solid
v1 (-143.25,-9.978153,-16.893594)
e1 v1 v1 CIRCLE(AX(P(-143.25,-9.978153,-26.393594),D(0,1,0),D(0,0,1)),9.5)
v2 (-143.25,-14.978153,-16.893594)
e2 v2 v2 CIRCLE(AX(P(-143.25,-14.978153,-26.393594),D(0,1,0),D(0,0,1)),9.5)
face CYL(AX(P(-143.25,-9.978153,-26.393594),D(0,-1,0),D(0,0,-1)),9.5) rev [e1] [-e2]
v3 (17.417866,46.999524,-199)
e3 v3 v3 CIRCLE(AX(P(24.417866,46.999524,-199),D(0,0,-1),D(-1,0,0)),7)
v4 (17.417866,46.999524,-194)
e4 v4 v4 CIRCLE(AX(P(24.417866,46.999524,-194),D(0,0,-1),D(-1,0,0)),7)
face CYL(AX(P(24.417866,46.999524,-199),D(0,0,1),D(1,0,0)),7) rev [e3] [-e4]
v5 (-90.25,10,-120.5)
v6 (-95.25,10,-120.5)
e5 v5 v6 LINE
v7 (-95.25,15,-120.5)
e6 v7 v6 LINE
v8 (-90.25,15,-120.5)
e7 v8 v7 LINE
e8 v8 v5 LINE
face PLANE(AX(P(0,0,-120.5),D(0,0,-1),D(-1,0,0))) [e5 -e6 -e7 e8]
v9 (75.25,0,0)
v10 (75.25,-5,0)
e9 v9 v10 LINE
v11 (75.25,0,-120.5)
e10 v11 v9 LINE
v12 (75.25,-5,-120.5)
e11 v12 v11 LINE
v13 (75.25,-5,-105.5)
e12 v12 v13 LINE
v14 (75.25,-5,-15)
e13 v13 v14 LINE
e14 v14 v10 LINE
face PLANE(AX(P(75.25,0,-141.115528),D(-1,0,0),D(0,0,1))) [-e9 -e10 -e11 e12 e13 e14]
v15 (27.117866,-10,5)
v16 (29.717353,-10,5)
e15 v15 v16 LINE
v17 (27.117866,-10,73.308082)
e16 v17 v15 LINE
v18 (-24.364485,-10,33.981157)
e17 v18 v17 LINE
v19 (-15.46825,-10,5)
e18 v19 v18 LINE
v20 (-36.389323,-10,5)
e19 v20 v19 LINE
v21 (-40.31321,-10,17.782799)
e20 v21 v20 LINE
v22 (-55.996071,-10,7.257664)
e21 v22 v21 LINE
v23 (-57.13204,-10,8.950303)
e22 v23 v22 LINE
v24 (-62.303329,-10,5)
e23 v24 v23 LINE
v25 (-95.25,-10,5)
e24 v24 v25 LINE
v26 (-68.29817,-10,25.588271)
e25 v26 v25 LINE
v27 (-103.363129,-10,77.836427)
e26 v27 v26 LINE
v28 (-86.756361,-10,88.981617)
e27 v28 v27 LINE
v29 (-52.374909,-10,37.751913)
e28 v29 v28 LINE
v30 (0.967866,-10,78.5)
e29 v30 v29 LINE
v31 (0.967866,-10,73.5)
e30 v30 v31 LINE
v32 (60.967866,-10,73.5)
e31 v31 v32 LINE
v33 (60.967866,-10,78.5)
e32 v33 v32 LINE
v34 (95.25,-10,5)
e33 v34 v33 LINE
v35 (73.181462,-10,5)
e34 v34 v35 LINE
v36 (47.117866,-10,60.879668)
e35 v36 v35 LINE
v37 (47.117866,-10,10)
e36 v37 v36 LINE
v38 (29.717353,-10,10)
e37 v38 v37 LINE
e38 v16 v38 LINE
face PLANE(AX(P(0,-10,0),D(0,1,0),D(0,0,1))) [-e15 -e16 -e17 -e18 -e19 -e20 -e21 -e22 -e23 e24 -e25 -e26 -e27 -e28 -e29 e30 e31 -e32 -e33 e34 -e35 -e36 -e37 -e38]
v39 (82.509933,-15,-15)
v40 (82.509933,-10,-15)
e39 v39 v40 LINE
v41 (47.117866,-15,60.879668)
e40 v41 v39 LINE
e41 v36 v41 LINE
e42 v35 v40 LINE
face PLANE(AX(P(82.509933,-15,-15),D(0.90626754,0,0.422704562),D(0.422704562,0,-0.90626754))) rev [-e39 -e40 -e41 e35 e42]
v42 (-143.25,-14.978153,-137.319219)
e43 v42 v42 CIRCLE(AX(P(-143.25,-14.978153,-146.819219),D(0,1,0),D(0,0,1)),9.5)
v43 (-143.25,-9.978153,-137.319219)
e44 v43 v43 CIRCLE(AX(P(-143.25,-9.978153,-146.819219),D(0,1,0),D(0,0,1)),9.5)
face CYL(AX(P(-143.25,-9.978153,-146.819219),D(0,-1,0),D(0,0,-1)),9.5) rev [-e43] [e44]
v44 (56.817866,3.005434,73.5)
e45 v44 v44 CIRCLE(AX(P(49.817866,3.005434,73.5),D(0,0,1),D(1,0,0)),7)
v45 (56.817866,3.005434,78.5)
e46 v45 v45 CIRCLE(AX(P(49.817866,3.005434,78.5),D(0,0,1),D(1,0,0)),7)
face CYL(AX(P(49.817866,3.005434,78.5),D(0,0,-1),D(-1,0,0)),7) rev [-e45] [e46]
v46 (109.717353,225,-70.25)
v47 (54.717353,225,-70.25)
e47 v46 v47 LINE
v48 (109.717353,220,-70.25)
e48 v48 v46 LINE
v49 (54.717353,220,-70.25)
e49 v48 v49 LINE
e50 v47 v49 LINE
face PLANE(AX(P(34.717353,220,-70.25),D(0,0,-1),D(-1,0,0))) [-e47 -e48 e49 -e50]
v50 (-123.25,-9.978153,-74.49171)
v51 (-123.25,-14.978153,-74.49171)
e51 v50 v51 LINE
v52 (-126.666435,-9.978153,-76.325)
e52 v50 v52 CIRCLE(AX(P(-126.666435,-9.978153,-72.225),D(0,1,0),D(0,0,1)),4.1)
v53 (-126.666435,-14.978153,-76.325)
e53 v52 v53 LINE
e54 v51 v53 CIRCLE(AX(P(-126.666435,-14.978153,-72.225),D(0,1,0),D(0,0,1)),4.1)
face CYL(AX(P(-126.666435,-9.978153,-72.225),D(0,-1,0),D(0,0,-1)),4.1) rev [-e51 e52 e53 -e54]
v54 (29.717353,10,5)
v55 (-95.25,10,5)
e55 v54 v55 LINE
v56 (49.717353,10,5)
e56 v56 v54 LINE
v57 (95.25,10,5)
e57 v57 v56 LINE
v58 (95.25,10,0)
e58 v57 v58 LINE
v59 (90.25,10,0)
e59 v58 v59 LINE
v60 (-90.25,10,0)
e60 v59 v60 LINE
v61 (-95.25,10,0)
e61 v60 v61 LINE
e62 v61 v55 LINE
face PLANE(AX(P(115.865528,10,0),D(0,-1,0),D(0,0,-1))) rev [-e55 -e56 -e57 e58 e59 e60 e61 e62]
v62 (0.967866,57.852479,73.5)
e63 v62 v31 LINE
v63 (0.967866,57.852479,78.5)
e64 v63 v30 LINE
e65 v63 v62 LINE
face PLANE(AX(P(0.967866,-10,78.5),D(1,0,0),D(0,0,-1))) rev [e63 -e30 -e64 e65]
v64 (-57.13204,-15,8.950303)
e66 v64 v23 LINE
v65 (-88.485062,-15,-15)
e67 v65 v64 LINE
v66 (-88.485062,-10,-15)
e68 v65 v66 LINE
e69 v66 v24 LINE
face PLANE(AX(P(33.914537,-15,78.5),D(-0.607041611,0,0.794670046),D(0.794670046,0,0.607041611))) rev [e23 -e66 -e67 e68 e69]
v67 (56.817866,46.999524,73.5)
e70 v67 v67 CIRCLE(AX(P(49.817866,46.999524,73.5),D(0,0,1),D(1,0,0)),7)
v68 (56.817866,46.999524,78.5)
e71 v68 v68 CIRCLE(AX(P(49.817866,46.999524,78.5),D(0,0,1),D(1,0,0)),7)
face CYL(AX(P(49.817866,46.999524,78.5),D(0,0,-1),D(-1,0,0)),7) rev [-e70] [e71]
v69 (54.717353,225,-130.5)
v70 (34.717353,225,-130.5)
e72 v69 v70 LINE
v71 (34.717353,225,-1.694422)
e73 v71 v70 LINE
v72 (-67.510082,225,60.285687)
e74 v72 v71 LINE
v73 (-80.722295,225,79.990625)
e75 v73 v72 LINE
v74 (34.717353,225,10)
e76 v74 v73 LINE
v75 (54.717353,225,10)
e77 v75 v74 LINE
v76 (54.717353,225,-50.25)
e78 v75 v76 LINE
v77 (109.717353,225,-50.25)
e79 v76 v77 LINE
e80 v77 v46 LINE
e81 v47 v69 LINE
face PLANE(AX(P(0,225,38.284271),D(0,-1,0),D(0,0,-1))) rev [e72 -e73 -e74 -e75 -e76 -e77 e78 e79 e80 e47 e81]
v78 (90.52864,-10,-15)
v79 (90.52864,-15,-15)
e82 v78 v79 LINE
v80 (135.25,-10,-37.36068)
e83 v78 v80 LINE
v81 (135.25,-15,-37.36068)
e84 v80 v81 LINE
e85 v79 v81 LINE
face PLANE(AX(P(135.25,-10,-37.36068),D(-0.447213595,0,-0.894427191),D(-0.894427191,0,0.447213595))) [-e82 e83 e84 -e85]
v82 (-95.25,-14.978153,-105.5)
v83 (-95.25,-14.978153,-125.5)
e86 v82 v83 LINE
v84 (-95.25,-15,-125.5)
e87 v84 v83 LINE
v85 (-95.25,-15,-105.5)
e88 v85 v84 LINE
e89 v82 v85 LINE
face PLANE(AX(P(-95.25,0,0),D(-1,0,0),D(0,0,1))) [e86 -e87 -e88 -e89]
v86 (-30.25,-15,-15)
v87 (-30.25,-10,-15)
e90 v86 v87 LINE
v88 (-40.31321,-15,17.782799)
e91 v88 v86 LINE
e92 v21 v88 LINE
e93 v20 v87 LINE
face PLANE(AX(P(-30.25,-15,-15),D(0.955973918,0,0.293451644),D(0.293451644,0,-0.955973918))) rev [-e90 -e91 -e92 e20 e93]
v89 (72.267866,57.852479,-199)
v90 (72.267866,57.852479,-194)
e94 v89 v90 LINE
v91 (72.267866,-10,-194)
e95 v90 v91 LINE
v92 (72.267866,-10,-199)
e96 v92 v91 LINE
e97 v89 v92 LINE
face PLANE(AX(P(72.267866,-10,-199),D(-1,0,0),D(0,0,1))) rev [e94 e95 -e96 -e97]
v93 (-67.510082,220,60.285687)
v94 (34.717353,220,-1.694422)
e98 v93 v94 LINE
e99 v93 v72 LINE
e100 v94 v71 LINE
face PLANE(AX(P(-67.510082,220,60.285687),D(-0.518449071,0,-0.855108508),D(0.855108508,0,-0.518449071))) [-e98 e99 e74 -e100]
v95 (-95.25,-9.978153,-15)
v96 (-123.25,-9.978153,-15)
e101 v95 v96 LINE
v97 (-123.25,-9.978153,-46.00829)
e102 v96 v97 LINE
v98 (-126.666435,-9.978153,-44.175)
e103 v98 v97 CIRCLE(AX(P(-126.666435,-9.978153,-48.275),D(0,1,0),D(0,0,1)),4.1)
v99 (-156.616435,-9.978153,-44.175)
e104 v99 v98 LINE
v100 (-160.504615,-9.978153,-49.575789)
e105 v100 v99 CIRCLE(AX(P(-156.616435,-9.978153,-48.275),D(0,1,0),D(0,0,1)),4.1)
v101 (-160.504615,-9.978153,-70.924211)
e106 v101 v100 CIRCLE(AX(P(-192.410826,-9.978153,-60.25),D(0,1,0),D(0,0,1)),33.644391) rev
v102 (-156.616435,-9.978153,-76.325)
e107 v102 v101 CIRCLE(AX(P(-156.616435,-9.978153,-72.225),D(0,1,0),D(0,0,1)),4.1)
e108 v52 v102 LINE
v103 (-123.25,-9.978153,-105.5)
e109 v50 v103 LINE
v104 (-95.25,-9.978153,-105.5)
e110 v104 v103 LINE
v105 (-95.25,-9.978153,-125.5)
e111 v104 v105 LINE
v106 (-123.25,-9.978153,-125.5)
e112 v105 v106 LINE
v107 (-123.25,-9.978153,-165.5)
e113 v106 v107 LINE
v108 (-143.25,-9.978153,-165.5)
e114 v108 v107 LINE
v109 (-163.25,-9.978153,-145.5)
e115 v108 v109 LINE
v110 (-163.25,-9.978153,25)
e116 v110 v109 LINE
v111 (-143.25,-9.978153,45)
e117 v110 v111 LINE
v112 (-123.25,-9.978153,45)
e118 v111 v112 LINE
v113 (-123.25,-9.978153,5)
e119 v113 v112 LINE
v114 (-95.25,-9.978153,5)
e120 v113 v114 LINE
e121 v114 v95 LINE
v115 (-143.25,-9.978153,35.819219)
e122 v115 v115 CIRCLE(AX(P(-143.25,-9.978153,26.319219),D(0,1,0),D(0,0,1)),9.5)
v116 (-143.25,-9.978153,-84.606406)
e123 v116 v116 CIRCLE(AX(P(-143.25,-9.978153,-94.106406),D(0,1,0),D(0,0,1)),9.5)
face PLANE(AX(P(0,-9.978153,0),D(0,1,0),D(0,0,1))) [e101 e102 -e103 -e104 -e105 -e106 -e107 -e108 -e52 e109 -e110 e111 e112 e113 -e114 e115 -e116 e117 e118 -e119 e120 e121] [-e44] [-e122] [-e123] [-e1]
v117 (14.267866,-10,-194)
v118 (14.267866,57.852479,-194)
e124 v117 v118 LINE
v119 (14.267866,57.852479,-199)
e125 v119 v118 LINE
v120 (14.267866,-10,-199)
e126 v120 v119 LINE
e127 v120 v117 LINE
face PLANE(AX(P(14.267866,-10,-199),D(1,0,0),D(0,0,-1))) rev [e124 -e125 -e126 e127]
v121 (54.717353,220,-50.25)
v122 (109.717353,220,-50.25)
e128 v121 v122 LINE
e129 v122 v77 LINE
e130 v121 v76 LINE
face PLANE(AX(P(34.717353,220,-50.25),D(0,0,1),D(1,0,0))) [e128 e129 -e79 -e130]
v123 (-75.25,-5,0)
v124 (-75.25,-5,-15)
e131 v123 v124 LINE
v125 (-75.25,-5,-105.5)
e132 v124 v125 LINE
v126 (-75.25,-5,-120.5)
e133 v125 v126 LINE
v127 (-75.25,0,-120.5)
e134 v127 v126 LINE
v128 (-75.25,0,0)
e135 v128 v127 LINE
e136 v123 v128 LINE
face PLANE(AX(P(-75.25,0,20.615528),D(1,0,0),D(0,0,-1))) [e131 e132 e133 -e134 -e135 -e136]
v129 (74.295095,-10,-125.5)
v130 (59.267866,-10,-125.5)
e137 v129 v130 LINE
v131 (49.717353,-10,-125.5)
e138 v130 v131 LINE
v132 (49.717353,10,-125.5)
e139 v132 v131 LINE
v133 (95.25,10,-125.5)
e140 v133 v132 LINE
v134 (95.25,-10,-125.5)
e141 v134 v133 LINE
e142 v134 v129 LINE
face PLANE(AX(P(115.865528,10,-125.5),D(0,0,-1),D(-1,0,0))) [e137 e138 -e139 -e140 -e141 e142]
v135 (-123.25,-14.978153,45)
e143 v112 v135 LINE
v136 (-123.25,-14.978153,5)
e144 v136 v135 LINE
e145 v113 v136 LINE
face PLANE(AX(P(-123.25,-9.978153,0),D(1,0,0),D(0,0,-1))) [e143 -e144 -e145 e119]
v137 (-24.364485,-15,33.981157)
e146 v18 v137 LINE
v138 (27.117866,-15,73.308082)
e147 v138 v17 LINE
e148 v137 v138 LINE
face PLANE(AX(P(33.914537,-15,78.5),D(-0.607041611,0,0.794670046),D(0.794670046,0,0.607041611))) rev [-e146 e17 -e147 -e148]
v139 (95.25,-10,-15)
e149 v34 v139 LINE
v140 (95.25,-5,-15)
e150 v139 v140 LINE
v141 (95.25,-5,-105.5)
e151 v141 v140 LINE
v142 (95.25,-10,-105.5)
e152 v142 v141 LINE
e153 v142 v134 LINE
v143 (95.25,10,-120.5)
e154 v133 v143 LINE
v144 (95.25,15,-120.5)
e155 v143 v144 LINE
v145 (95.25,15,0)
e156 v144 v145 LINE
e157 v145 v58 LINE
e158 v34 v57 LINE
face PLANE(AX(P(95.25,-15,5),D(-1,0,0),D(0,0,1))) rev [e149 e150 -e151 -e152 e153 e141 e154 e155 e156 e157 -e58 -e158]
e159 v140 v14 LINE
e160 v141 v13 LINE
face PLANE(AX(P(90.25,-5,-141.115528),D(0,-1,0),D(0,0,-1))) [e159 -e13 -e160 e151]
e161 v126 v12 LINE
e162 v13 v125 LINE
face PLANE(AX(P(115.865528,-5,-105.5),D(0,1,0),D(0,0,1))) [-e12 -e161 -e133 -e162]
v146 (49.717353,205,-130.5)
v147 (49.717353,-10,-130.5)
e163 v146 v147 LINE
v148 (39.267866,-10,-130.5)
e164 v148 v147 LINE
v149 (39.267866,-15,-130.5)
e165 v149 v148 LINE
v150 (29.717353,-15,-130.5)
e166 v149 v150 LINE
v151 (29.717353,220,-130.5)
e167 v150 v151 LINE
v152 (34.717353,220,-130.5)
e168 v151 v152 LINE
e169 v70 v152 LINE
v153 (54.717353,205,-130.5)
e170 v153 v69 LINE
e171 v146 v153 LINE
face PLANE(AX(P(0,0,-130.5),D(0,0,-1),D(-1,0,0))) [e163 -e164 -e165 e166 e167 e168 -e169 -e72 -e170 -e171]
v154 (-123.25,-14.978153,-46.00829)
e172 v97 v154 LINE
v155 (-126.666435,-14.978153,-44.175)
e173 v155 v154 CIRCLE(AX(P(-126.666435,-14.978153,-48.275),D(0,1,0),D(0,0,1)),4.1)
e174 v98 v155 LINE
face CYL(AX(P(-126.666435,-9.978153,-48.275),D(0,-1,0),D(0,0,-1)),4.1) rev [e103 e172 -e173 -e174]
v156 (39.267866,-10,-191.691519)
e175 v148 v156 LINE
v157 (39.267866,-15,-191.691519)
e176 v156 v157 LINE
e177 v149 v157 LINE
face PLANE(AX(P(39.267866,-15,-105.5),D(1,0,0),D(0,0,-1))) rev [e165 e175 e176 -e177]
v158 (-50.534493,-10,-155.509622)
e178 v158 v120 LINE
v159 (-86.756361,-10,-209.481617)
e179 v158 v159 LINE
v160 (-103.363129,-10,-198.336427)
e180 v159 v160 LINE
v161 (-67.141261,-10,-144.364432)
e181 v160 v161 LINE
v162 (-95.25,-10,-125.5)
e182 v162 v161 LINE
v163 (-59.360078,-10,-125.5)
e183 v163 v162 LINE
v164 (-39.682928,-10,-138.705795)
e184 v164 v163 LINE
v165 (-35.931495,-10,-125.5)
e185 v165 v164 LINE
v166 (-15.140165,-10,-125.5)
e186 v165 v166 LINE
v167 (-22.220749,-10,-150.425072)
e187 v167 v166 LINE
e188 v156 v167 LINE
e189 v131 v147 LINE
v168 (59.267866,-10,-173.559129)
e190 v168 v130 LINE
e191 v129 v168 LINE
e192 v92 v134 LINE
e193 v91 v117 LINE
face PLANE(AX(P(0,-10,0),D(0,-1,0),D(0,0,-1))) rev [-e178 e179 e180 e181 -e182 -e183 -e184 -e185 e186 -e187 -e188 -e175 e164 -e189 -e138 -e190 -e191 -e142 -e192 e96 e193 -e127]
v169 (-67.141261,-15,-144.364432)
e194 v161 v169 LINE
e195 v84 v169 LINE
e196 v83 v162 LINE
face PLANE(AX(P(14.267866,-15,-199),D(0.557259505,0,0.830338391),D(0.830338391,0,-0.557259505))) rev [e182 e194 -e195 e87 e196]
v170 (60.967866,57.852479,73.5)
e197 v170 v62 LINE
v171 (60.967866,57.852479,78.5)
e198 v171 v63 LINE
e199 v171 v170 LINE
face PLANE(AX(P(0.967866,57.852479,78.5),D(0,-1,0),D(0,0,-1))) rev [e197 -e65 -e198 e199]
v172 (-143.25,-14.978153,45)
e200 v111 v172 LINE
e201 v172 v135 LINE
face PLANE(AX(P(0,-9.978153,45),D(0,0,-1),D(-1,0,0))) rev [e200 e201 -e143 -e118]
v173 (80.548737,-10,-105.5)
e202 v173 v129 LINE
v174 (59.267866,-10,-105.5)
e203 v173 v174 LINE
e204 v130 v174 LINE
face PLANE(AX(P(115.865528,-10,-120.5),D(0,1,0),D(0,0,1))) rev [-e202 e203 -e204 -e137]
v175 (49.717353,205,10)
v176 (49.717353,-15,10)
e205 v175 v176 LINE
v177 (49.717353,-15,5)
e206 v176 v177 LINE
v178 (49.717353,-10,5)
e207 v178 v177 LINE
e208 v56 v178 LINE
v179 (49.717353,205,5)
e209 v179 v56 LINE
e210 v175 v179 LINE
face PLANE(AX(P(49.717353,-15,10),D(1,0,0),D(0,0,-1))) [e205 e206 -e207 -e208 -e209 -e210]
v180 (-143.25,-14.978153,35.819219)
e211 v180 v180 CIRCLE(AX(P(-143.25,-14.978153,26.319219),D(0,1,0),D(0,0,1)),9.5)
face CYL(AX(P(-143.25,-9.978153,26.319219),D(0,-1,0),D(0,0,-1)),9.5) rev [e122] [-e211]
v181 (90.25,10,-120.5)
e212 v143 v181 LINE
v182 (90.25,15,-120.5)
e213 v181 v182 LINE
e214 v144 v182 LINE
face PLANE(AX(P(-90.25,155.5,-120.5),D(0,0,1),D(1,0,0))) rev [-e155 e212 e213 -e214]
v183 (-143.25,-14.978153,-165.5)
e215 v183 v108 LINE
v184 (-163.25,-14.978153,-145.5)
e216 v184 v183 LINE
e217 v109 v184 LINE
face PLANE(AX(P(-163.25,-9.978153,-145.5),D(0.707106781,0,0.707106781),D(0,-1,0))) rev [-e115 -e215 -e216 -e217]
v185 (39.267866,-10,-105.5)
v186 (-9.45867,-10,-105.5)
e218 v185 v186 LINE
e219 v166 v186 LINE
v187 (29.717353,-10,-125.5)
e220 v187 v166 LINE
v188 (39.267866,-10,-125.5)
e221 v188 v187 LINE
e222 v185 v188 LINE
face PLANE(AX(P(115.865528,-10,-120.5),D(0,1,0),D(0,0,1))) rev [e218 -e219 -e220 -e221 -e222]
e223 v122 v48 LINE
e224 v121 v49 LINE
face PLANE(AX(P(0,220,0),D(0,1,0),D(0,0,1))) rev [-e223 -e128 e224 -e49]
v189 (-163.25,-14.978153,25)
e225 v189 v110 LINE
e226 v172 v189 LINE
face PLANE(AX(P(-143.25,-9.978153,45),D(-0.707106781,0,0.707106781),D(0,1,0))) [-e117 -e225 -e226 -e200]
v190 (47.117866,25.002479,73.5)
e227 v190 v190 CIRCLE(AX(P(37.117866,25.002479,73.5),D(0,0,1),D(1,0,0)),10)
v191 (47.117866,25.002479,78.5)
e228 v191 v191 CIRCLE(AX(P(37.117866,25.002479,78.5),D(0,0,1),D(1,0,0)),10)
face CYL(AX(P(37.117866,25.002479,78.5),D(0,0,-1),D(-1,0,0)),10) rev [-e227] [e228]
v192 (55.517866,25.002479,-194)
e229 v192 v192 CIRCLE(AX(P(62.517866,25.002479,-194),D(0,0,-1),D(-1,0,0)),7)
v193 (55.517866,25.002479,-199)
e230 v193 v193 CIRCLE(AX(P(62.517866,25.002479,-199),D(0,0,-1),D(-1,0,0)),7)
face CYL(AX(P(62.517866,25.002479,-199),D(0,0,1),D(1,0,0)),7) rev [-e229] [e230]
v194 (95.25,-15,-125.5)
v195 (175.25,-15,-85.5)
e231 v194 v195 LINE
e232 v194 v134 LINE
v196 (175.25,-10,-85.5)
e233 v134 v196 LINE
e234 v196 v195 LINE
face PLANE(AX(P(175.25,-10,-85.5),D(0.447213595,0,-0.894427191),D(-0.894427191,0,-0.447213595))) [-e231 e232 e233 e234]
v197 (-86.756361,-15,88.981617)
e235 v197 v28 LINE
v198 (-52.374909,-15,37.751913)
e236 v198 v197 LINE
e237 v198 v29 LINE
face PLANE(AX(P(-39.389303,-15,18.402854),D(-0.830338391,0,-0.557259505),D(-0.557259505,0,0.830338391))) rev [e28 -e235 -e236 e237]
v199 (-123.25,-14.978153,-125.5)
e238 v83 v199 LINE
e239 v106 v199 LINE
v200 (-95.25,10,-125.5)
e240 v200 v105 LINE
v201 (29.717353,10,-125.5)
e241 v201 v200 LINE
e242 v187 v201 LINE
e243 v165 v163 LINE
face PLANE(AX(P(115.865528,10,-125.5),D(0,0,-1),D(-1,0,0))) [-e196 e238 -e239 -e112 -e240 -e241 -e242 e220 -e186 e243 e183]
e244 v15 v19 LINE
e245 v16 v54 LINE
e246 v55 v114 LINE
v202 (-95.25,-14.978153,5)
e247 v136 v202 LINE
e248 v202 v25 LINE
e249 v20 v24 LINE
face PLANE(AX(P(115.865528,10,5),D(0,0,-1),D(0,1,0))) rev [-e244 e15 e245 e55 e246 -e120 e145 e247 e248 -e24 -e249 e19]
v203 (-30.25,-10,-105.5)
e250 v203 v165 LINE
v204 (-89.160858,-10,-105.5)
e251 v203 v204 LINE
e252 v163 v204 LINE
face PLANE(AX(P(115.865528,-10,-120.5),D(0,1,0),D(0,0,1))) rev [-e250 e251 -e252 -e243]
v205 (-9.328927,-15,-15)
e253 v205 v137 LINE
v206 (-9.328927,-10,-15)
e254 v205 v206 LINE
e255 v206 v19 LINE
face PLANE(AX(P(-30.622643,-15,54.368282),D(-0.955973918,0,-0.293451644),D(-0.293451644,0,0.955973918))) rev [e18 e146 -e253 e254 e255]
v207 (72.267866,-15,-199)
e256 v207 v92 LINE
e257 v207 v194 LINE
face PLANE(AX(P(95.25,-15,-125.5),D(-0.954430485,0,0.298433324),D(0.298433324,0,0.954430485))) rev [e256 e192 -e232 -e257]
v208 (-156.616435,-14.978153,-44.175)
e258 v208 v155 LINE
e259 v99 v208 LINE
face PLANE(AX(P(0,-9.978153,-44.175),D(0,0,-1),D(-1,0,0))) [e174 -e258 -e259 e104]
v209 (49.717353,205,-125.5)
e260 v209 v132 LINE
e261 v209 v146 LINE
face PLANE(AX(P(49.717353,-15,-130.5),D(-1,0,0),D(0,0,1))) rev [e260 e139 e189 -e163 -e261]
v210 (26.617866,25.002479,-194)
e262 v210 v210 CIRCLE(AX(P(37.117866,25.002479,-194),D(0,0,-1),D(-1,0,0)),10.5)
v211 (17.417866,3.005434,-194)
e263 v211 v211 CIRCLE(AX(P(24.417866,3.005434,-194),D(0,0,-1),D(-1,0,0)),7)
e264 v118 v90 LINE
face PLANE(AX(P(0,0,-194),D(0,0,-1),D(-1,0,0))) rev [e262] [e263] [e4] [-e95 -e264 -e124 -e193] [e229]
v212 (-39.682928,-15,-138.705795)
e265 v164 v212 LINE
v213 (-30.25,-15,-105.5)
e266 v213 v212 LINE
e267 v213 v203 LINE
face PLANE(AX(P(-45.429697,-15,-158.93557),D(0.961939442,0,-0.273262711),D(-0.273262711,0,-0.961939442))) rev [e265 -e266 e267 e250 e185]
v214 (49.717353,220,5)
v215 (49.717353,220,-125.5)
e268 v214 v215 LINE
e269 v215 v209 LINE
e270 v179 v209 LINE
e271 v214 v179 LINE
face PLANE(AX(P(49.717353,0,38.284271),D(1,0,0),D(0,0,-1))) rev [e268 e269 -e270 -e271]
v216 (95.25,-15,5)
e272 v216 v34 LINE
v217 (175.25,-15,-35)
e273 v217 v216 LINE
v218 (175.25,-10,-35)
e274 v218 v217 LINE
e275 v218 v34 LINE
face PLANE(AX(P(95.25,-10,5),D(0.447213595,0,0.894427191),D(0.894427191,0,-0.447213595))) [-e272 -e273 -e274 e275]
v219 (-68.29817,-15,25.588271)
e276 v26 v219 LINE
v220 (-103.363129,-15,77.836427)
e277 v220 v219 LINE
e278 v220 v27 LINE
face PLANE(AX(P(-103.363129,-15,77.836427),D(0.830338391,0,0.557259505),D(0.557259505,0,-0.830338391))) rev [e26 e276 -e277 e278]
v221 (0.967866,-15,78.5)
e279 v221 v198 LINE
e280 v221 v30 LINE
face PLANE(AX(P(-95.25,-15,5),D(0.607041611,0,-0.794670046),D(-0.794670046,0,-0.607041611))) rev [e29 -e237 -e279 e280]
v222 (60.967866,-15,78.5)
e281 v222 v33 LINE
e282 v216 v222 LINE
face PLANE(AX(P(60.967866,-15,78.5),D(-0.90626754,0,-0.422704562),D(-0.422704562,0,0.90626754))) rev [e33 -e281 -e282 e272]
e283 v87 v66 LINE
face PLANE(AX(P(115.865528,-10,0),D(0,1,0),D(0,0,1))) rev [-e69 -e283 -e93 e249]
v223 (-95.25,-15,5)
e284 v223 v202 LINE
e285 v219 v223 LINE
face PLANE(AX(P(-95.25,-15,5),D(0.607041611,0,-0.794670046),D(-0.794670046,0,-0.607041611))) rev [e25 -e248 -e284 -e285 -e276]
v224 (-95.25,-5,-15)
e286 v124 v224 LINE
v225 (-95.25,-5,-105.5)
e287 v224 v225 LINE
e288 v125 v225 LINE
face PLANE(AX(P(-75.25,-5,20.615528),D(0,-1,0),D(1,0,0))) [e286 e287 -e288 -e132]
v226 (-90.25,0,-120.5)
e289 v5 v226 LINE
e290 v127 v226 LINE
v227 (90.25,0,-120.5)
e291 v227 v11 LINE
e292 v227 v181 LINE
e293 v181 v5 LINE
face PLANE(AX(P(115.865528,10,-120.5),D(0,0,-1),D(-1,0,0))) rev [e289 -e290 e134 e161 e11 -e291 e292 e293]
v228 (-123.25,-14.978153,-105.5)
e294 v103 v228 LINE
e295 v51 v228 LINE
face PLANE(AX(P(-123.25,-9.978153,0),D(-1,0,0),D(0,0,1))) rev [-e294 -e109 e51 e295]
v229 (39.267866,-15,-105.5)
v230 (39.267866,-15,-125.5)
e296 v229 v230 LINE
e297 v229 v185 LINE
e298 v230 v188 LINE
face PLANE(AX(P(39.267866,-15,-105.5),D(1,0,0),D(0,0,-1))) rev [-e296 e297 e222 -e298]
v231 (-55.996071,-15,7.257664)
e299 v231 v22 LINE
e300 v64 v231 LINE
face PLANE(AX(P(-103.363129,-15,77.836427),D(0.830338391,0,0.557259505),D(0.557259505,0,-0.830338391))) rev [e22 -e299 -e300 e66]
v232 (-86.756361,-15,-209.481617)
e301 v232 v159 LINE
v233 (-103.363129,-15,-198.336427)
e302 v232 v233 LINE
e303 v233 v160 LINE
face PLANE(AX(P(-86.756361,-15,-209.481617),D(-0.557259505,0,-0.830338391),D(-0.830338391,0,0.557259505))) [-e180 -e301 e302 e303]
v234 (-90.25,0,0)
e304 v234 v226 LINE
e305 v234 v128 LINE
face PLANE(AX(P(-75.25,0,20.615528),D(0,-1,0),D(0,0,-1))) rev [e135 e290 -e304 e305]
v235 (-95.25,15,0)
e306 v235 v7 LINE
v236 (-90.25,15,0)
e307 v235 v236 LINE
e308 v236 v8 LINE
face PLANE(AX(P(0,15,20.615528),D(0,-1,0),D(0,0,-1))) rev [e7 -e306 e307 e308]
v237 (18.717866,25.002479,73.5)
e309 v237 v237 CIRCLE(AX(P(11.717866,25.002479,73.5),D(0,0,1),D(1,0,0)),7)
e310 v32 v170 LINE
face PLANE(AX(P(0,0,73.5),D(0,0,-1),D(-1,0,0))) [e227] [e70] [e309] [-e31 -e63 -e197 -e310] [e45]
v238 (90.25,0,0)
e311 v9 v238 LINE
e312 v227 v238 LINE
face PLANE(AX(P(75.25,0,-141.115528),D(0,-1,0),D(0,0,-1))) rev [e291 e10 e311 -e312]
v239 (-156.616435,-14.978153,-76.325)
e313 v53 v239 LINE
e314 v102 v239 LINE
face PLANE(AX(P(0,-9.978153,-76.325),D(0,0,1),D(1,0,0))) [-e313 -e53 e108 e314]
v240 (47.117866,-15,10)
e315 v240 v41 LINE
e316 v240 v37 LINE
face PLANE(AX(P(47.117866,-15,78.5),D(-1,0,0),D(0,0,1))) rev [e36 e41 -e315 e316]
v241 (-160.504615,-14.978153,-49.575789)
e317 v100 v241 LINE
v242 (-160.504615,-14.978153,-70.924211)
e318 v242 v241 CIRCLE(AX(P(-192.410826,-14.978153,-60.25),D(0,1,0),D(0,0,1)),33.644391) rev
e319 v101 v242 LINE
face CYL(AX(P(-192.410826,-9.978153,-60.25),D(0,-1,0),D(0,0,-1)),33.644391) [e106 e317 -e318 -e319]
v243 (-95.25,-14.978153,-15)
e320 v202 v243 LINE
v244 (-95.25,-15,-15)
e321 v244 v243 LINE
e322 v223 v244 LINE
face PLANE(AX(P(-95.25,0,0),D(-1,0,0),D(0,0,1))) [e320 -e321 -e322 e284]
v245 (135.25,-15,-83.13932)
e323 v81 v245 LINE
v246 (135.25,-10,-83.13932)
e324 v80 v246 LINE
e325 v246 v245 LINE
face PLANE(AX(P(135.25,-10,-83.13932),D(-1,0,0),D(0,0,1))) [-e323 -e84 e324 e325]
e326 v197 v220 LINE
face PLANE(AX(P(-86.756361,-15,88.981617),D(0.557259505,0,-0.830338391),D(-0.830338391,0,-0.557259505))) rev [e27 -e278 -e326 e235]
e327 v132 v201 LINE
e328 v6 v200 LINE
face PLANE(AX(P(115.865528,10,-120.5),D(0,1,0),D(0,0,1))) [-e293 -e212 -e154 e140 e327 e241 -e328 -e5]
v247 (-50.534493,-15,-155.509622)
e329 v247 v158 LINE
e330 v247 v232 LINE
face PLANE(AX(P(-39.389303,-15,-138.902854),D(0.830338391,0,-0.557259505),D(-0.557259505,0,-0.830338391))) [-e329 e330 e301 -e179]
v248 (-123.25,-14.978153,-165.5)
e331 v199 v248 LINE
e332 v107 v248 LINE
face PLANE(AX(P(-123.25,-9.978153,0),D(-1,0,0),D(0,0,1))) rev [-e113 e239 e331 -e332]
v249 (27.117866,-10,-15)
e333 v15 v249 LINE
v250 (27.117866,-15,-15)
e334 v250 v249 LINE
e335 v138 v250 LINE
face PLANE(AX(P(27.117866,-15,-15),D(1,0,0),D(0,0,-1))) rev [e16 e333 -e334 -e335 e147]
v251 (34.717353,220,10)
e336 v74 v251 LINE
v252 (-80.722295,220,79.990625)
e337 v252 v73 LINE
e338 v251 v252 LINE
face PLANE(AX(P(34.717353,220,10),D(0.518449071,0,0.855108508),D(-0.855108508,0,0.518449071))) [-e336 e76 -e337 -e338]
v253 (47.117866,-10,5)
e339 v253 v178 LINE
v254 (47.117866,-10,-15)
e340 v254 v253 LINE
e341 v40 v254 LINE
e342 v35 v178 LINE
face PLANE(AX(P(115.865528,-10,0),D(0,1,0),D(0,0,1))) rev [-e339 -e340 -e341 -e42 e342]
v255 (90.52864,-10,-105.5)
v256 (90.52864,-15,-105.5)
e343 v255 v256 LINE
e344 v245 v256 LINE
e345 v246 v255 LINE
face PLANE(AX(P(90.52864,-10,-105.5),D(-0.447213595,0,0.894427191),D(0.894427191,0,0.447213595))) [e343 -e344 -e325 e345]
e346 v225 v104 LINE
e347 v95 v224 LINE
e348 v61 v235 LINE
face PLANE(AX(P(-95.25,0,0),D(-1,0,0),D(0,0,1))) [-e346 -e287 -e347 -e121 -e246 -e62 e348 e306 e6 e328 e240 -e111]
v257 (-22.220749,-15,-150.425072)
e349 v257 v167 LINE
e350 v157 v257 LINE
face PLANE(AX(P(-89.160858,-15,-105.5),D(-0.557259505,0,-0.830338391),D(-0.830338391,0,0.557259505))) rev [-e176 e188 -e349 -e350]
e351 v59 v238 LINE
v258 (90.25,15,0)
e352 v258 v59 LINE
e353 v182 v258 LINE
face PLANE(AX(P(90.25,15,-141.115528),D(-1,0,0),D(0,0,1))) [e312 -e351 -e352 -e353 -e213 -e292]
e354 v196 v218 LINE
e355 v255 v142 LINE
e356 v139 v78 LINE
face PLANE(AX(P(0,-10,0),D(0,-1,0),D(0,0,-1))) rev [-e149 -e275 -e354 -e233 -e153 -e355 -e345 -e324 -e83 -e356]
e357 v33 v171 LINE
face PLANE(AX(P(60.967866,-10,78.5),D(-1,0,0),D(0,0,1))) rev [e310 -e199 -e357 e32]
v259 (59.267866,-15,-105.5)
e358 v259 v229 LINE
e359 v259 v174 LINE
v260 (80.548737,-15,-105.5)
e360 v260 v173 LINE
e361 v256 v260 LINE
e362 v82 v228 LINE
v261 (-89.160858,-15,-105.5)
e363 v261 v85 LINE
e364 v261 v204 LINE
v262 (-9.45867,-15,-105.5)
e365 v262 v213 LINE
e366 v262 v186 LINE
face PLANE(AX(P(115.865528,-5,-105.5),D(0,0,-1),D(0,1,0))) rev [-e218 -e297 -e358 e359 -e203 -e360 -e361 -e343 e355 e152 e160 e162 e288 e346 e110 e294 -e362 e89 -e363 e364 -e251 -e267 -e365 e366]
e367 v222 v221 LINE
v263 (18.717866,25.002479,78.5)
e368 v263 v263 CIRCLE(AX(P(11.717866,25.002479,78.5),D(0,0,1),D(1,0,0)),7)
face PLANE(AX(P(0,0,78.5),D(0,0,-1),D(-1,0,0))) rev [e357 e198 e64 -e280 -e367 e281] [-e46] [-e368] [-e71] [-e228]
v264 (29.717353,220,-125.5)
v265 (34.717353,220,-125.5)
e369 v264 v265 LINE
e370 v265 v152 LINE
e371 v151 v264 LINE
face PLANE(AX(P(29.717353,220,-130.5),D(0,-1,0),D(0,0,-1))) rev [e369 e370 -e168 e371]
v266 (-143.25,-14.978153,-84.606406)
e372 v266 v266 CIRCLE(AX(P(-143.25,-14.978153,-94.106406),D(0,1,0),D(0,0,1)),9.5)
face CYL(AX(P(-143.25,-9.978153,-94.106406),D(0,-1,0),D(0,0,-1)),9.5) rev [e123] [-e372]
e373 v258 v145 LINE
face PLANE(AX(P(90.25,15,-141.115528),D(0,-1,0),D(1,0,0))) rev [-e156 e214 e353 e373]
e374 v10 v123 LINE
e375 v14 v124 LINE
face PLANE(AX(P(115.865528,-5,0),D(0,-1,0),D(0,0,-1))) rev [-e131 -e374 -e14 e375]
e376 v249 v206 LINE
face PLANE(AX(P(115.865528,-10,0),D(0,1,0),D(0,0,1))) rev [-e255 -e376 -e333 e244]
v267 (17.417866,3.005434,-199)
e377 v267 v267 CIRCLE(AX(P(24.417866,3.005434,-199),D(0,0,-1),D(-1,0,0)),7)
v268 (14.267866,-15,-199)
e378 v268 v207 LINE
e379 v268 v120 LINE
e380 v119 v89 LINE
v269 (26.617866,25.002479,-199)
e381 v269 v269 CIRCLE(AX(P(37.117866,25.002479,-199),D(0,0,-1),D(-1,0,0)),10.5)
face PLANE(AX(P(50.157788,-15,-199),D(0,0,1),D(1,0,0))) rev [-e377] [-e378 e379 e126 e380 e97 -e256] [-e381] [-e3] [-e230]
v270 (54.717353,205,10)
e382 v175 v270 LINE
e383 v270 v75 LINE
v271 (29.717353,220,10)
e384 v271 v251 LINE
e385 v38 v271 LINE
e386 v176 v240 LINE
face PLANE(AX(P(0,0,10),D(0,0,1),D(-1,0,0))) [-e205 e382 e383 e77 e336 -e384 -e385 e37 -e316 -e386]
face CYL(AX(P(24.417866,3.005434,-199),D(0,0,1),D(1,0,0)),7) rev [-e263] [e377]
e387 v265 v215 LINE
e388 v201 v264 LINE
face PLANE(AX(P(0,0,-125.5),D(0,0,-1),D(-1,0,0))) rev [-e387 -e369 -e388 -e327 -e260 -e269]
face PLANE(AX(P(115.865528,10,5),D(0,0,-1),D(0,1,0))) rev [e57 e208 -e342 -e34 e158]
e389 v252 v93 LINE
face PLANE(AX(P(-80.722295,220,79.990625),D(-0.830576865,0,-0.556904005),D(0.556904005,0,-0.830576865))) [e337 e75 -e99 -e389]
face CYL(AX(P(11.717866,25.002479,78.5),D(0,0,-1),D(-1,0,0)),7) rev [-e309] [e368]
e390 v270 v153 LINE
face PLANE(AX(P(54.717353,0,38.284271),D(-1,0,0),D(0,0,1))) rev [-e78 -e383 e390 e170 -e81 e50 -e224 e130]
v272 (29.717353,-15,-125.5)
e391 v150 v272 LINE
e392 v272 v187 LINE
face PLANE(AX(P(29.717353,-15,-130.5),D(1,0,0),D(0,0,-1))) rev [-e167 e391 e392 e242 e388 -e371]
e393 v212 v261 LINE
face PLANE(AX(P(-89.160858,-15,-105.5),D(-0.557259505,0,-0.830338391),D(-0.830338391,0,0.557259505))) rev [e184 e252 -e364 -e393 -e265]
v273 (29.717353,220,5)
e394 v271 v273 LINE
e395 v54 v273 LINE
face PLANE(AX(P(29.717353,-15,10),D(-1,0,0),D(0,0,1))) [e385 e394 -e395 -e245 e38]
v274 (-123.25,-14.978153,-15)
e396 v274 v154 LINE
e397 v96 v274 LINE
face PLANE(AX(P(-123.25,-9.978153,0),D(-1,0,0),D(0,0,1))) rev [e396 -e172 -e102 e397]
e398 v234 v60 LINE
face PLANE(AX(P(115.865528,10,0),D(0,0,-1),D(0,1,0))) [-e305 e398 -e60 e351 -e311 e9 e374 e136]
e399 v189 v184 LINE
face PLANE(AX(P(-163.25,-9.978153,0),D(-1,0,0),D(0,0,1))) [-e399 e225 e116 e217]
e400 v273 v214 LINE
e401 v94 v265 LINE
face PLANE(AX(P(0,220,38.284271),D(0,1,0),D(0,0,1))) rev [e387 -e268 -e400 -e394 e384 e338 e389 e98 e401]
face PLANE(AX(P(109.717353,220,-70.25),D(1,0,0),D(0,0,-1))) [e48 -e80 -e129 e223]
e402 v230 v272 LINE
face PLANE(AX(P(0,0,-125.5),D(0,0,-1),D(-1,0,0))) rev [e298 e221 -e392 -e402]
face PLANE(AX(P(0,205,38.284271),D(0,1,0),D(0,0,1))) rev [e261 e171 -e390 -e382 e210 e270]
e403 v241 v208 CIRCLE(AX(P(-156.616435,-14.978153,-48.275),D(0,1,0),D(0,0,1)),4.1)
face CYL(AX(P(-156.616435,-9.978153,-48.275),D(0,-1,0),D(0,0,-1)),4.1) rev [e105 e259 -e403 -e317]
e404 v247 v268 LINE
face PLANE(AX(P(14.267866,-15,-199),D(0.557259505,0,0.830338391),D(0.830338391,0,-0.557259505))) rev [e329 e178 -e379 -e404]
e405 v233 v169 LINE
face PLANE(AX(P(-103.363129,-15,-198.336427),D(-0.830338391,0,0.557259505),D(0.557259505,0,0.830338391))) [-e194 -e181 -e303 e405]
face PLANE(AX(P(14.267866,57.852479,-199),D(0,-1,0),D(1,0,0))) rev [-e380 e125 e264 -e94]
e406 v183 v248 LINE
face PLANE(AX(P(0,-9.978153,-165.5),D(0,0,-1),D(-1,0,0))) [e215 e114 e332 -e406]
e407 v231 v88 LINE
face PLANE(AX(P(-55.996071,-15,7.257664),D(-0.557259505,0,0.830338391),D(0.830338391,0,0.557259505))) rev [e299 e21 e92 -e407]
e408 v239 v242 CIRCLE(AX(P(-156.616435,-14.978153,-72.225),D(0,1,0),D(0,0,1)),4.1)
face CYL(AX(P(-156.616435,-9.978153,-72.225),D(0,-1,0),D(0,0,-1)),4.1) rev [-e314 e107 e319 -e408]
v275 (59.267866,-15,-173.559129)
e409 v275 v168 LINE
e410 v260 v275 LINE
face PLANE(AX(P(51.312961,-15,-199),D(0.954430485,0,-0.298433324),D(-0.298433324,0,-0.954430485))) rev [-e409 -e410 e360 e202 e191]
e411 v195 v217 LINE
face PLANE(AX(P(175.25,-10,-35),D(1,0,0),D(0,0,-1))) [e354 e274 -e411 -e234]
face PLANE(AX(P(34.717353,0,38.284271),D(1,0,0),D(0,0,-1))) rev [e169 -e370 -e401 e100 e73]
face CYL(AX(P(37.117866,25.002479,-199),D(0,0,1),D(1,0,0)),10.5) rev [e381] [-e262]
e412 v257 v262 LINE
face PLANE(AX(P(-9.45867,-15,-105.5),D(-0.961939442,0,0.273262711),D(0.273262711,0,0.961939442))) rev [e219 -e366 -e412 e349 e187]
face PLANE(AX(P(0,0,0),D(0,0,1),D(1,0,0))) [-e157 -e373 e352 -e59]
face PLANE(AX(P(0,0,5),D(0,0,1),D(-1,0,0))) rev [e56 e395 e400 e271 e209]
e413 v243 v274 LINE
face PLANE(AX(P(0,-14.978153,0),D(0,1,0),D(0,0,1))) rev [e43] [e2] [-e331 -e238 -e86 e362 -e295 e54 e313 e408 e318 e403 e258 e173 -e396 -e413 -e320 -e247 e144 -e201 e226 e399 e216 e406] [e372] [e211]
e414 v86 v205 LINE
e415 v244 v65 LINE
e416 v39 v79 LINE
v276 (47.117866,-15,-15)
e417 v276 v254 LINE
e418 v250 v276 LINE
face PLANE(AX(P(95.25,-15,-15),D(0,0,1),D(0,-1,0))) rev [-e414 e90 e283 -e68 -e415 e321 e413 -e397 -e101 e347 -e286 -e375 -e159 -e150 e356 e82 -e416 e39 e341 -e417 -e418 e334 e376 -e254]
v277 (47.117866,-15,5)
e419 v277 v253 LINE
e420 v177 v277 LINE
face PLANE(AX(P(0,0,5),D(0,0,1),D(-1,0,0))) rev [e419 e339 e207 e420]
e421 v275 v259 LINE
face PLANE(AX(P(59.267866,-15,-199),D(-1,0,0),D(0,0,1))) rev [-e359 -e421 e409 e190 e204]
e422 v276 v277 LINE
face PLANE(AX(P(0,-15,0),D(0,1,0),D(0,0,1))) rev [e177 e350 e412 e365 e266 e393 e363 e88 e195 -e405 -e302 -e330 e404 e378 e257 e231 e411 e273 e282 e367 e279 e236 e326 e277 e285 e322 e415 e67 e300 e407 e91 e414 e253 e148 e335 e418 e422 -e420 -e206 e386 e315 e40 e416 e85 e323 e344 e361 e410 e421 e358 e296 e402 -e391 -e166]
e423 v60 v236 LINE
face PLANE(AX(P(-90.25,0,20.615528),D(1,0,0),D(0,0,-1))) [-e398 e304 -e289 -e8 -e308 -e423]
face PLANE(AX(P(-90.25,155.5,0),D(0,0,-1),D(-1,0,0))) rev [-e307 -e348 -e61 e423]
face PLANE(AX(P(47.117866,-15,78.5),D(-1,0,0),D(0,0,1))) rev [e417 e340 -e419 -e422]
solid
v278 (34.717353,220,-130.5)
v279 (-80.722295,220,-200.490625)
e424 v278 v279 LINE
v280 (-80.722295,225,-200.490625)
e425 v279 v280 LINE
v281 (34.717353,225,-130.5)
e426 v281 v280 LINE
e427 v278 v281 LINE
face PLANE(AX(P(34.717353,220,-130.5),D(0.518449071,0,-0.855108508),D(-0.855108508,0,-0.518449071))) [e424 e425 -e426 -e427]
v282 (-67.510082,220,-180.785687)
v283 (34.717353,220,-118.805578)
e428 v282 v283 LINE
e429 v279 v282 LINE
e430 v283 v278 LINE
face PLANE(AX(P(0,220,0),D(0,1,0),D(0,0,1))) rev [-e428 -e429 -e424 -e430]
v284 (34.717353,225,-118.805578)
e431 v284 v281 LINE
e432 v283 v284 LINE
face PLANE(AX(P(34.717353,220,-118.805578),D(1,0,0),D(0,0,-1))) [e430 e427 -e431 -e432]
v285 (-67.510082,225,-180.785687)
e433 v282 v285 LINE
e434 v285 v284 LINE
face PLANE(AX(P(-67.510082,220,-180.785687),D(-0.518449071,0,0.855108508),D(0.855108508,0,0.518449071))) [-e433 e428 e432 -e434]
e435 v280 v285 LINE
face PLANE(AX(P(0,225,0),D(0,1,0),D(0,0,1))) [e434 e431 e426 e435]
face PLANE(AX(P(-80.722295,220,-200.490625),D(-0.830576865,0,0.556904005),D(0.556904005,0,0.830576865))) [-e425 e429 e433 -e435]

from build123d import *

# Parameters (mm, degrees)
BATTERY_FRONT_SKETCH_W        = 5
BATTERY_FRONT_SKETCH_H        = 15
BATTERY_FRONT_SKETCH_H_2      = 5
BATTERY_FRONT_SKETCH_W_2      = 15
BATTERY_FRONT_DEPTH           = 120.5
BATTERY_REAR_SKETCH_W         = 5
BATTERY_REAR_SKETCH_H         = 15
BATTERY_REAR_SKETCH_H_2       = 5
BATTERY_REAR_SKETCH_W_2       = 15
BATTERY_REAR_DEPTH            = 120.5
BATTERY_SIDE_REACH            = 227.91
BATTERY_SIDE_SKETCH_W         = 5
BATTERY_SIDE_SKETCH_H         = 15
BATTERY_SIDE_SKETCH_H_2       = 5
BATTERY_SIDE_SKETCH_W_2       = 15
LEFT_MOTOR_ATTACH_SKETCH_W    = 58
LEFT_MOTOR_ATTACH_SKETCH_H    = 67.852479089
LEFT_MOTOR_ATTACH_SKETCH_R    = 7
LEFT_MOTOR_ATTACH_SKETCH_R_2  = 10.5
LEFT_MOTOR_ATTACH_DEPTH       = 5
RIGHT_MOTOR_ATTACH_SKETCH_W   = 60
RIGHT_MOTOR_ATTACH_SKETCH_H   = 67.852479089
RIGHT_MOTOR_ATTACH_SKETCH_R   = 7
RIGHT_MOTOR_ATTACH_SKETCH_R_2 = 10
RIGHT_MOTOR_ATTACH_DEPTH      = 5
SUPPORT_DEPTH                 = 5
SUPPORT_TO_MOTOR_1_DEPTH      = 5
SUPPORT_TO_MOTOR_SKETCH_2_W   = 20
SUPPORT_TO_MOTOR_SKETCH_2_H   = 93.5
SUPPORT_TO_MOTOR_2_DEPTH      = 5
SIDE_SUPPORT_DEPTH            = 5
SENSOR_ARRAY_OUTLINE_R        = 9.5
SENSOR_ARRAY_DEPTH            = 5
VERTICAL_SUPPORT_SKETCH_W     = 20
VERTICAL_SUPPORT_SKETCH_H     = 235
VERTICAL_SUPPORT_DEPTH        = 5
HORIZONTAL_SUPPORT_REACH      = 346.574
HORIZONTAL_SUPPORT_SKETCH_W   = 15
HORIZONTAL_SUPPORT_SKETCH_H   = 5
HORIZONTAL_SUPPORT_SKETCH_W_2 = 5
HORIZONTAL_SUPPORT_SKETCH_H_2 = 15
SUPPORT_FOR_BARS_SKETCH1_W    = 75
SUPPORT_FOR_BARS_SKETCH1_H    = 20
SUPPORT_FOR_BARS1_DEPTH       = 5
SUPPORT_FOR_BARS2_DEPTH       = 5
SUPPORT_FOR_BARS4_DEPTH       = 5
ARRAY_CHAMFER1_SIZE           = 20
ARRAY_CHAMPER2_SIZE           = 20
FRONT_CASTER_SUPPORT_DEPTH    = 5


# Read off the part's stored shape, not the designer's step: Sensor Array
with BuildPart() as part:
    # Battery Front sketch → Battery Front (new body)
    with BuildSketch(Plane.XY):
        with Locations((92.75, 7.5)):
            Rectangle(BATTERY_FRONT_SKETCH_W, BATTERY_FRONT_SKETCH_H)
        with Locations((92.75, -2.5)):
            Rectangle(BATTERY_FRONT_SKETCH_W, BATTERY_FRONT_SKETCH_H_2)
        with Locations((82.75, -2.5)):
            Rectangle(BATTERY_FRONT_SKETCH_W_2, BATTERY_FRONT_SKETCH_H_2)
    extrude(amount=-BATTERY_FRONT_DEPTH)

    # Battery Side: up to this face of the body (flat: up to its plane)
    battery_side_end = Plane(part.part.faces().sort_by_distance((95.25, 5, -60.25))[0])
    # Battery Side Sketch → Battery Side (add, up to the picked face)
    with BuildSketch(Plane.ZY.offset(95.25), mode=Mode.PRIVATE) as battery_side_sk1:
        with Locations((2.5, 2.5)):
            Rectangle(BATTERY_SIDE_SKETCH_W, BATTERY_SIDE_SKETCH_H)
    battery_side_tool1 = split(extrude(battery_side_sk1.sketch, amount=-BATTERY_SIDE_REACH, mode=Mode.PRIVATE), bisect_by=battery_side_end, keep=Keep.BOTH, mode=Mode.PRIVATE)
    # Battery Side Sketch → Battery Side (add, up to the picked face)
    with BuildSketch(Plane.ZY.offset(95.25), mode=Mode.PRIVATE) as battery_side_sk2:
        with Locations((2.5, -7.5)):
            Rectangle(BATTERY_SIDE_SKETCH_W, BATTERY_SIDE_SKETCH_H_2)
    battery_side_tool2 = split(extrude(battery_side_sk2.sketch, amount=-BATTERY_SIDE_REACH, mode=Mode.PRIVATE), bisect_by=battery_side_end, keep=Keep.BOTH, mode=Mode.PRIVATE)
    # Battery Side Sketch → Battery Side (add, up to the picked face)
    with BuildSketch(Plane.ZY.offset(95.25), mode=Mode.PRIVATE) as battery_side_sk3:
        with Locations((-7.5, -7.5)):
            Rectangle(BATTERY_SIDE_SKETCH_W_2, BATTERY_SIDE_SKETCH_H_2)
    battery_side_tool3 = split(extrude(battery_side_sk3.sketch, amount=-BATTERY_SIDE_REACH, mode=Mode.PRIVATE), bisect_by=battery_side_end, keep=Keep.BOTH, mode=Mode.PRIVATE)
    # Battery Side Sketch → Battery Side (add, up to the picked face)
    with BuildSketch(Plane.ZY.offset(95.25), mode=Mode.PRIVATE) as battery_side_sk4:
        with Locations((-123, 2.5)):
            Rectangle(BATTERY_SIDE_SKETCH_W, BATTERY_SIDE_SKETCH_H)
    battery_side_tool4 = split(extrude(battery_side_sk4.sketch, amount=-BATTERY_SIDE_REACH, mode=Mode.PRIVATE), bisect_by=battery_side_end, keep=Keep.BOTH, mode=Mode.PRIVATE)
    # Battery Side Sketch → Battery Side (add, up to the picked face)
    with BuildSketch(Plane.ZY.offset(95.25), mode=Mode.PRIVATE) as battery_side_sk5:
        with Locations((-113, -7.5)):
            Rectangle(BATTERY_SIDE_SKETCH_W_2, BATTERY_SIDE_SKETCH_H_2)
    battery_side_tool5 = split(extrude(battery_side_sk5.sketch, amount=-BATTERY_SIDE_REACH, mode=Mode.PRIVATE), bisect_by=battery_side_end, keep=Keep.BOTH, mode=Mode.PRIVATE)
    # Battery Side Sketch → Battery Side (add, up to the picked face)
    with BuildSketch(Plane.ZY.offset(95.25), mode=Mode.PRIVATE) as battery_side_sk6:
        with Locations((-123, -7.5)):
            Rectangle(BATTERY_SIDE_SKETCH_W, BATTERY_SIDE_SKETCH_H_2)
    battery_side_tool6 = split(extrude(battery_side_sk6.sketch, amount=-BATTERY_SIDE_REACH, mode=Mode.PRIVATE), bisect_by=battery_side_end, keep=Keep.BOTH, mode=Mode.PRIVATE)


with BuildPart() as body_2:
    # Battery Rear Sketch → Battery Rear (new body)
    with BuildSketch(Plane(origin=(0, 0, -120.5), x_dir=(-1, 0, 0), z_dir=(0, 0, -1))):
        with Locations((92.75, 7.5)):
            Rectangle(BATTERY_REAR_SKETCH_W, BATTERY_REAR_SKETCH_H)
        with Locations((92.75, -2.5)):
            Rectangle(BATTERY_REAR_SKETCH_W, BATTERY_REAR_SKETCH_H_2)
        with Locations((82.75, -2.5)):
            Rectangle(BATTERY_REAR_SKETCH_W_2, BATTERY_REAR_SKETCH_H_2)
    extrude(amount=-BATTERY_REAR_DEPTH)


with BuildPart() as part_1:
    add(part.part)

    add(body_2.part)  # Battery Side merges body 2
    add(battery_side_tool1.solids().sort_by(Axis((-95.25, 2.5, 2.5), (1, 0, 0)))[0])
    add(battery_side_tool2.solids().sort_by(Axis((-95.25, -7.5, 2.5), (1, 0, 0)))[0])
    add(battery_side_tool3.solids().sort_by(Axis((-95.25, -7.5, -7.5), (1, 0, 0)))[0])
    add(battery_side_tool4.solids().sort_by(Axis((-95.25, 2.5, -123), (1, 0, 0)))[0])
    add(battery_side_tool5.solids().sort_by(Axis((-95.25, -7.5, -113), (1, 0, 0)))[0])
    add(battery_side_tool6.solids().sort_by(Axis((-95.25, -7.5, -123), (1, 0, 0)))[0])



with BuildPart() as body_2_2:
    # Left Motor Attach Sketch → Left Motor Attach (new body)
    with BuildSketch(Plane(origin=(0, 0, -194), x_dir=(-1, 0, 0), z_dir=(0, 0, -1))):
        with Locations((-43.267865949, 23.926239545)):
            Rectangle(LEFT_MOTOR_ATTACH_SKETCH_W, LEFT_MOTOR_ATTACH_SKETCH_H)
        with Locations((-24.417865949, 46.999524345)):
            Circle(LEFT_MOTOR_ATTACH_SKETCH_R, mode=Mode.SUBTRACT)
        with Locations((-62.517865949, 25.002479089)):
            Circle(LEFT_MOTOR_ATTACH_SKETCH_R, mode=Mode.SUBTRACT)
        with Locations((-24.417865949, 3.005433833)):
            Circle(LEFT_MOTOR_ATTACH_SKETCH_R, mode=Mode.SUBTRACT)
        with Locations((-37.117865949, 25.002479089)):
            Circle(LEFT_MOTOR_ATTACH_SKETCH_R_2, mode=Mode.SUBTRACT)
    extrude(amount=LEFT_MOTOR_ATTACH_DEPTH)


with BuildPart() as body_3:
    # Right Motor Attach Sketch → Right Motor Attach (new body)
    with BuildSketch(Plane.XY.offset(73.5)):
        with Locations((30.967865949, 23.926239545)):
            Rectangle(RIGHT_MOTOR_ATTACH_SKETCH_W, RIGHT_MOTOR_ATTACH_SKETCH_H)
        with Locations((49.817865949, 46.999524345)):
            Circle(RIGHT_MOTOR_ATTACH_SKETCH_R, mode=Mode.SUBTRACT)
        with Locations((49.817865949, 3.005433833)):
            Circle(RIGHT_MOTOR_ATTACH_SKETCH_R, mode=Mode.SUBTRACT)
        with Locations((11.717865949, 25.002479089)):
            Circle(RIGHT_MOTOR_ATTACH_SKETCH_R, mode=Mode.SUBTRACT)
        with Locations((37.117865949, 25.002479089)):
            Circle(RIGHT_MOTOR_ATTACH_SKETCH_R_2, mode=Mode.SUBTRACT)
    extrude(amount=RIGHT_MOTOR_ATTACH_DEPTH)


with BuildPart() as part_2:
    add(part_1.part)

    add(body_2_2.part)  # Support merges body 2 2
    # Support Sketch → Support (add)
    with BuildSketch(Plane(origin=(0, -10, 0), x_dir=(-1, 0, 0), z_dir=(0, -1, 0))):
        Polygon((-14.267865949, 199), (95.25, 125.5), (95.25, 105.5), (89.160858149, 105.5), (-50.157787649, 199), align=None)
        Polygon((95.25, -5), (-0.967865949, -78.5), (-33.914536533, -78.5), (88.485061646, 15), (95.25, 15), align=None)
    extrude(amount=SUPPORT_DEPTH)


    add(body_3.part)  # Support to motor 1 merges body 3
    # Support to motor sketch 1 → Support to motor 1 (add)
    with BuildSketch(Plane(origin=(0, -10, 0), x_dir=(-1, 0, 0), z_dir=(0, -1, 0))):
        Polygon((-60.967865949, -78.5), (-95.25, -5), (-95.25, 15), (-82.509933452, 15), (-38.89932755, -78.5), align=None)
        Polygon((-95.25, 125.5), (-72.267865949, 199), (-51.312961099, 199), (-80.548737069, 105.5), (-95.25, 105.5), align=None)
    extrude(amount=SUPPORT_TO_MOTOR_1_DEPTH)

    # Support to motor sketch 2 → Support to motor 2 (add)
    with BuildSketch(Plane(origin=(0, -10, 0), x_dir=(-1, 0, 0), z_dir=(0, -1, 0))):
        with Locations((-37.117865949, -31.75)):
            Rectangle(SUPPORT_TO_MOTOR_SKETCH_2_W, SUPPORT_TO_MOTOR_SKETCH_2_H)
        with Locations((-49.267865949, 152.25)):
            Rectangle(SUPPORT_TO_MOTOR_SKETCH_2_W, SUPPORT_TO_MOTOR_SKETCH_2_H)
    extrude(amount=SUPPORT_TO_MOTOR_2_DEPTH)

    # Side Support sketch → Side Support (add)
    with BuildSketch(Plane(origin=(0, -10, 0), x_dir=(-1, 0, 0), z_dir=(0, -1, 0))):
        Polygon((30.622642515, -54.368282369), (9.328927137, 15), (30.25, 15), (47.569797237, -41.42249668), align=None)
        Polygon((9.458670401, 105.5), (27.967517526, 170.654846828), (45.42969652, 158.935570298), (30.25, 105.5), align=None)
    extrude(amount=SIDE_SUPPORT_DEPTH)

    # Sensor Array outline → Sensor Array (add)
    with BuildSketch(Plane(origin=(0, -14.978153268, 0), x_dir=(1, 0, 0), z_dir=(0, 1, 0))):
        with BuildLine():
            Line((-95.25, 15), (-123.25, 15))
            Line((-123.25, 15), (-123.25, 46.00829027))
            ThreePointArc((-123.25, 46.00829027), (-124.72781547, 44.662278734), (-126.666434838, 44.175))
            Line((-126.666434838, 44.175), (-156.616434838, 44.175))
            ThreePointArc((-156.616434838, 44.175), (-159.943838941, 45.879507998), (-160.504615286, 49.5757893))
            ThreePointArc((-160.504615286, 49.5757893), (-158.766434838, 60.25), (-160.504615286, 70.9242107))
            ThreePointArc((-160.504615286, 70.9242107), (-159.943838941, 74.620492002), (-156.616434838, 76.325))
            Line((-156.616434838, 76.325), (-126.666434838, 76.325))
            ThreePointArc((-126.666434838, 76.325), (-124.72781547, 75.837721266), (-123.25, 74.49170973))
            Line((-123.25, 74.49170973), (-123.25, 105.5))
            Line((-123.25, 105.5), (-95.25, 105.5))
            Line((-95.25, 105.5), (-95.25, 125.5))
            Line((-95.25, 125.5), (-123.25, 125.5))
            Line((-123.25, 125.5), (-123.25, 165.5))
            Line((-123.25, 165.5), (-163.25, 165.5))
            Line((-163.25, 165.5), (-163.25, -45))
            Line((-163.25, -45), (-123.25, -45))
            Line((-123.25, -45), (-123.25, -5))
            Line((-123.25, -5), (-95.25, -5))
            Line((-95.25, -5), (-95.25, 15))
        make_face()
        with Locations((-143.25, -26.319219382)):
            Circle(SENSOR_ARRAY_OUTLINE_R, mode=Mode.SUBTRACT)
        with Locations((-143.25, 26.393593539)):
            Circle(SENSOR_ARRAY_OUTLINE_R, mode=Mode.SUBTRACT)
        with Locations((-143.25, 94.106406461)):
            Circle(SENSOR_ARRAY_OUTLINE_R, mode=Mode.SUBTRACT)
        with Locations((-143.25, 146.819219382)):
            Circle(SENSOR_ARRAY_OUTLINE_R, mode=Mode.SUBTRACT)
    extrude(amount=SENSOR_ARRAY_DEPTH)

    # Vertical Support sketch → Vertical Support (add)
    with BuildSketch(Plane(origin=(0, 0, -125.5), x_dir=(-1, 0, 0), z_dir=(0, 0, -1))):
        with Locations((-39.71735315, 102.5)):
            Rectangle(VERTICAL_SUPPORT_SKETCH_W, VERTICAL_SUPPORT_SKETCH_H)
    vertical_support = extrude(amount=VERTICAL_SUPPORT_DEPTH)

    # Other Vertical Support: Vertical Support across plane
    add(vertical_support.mirror(Plane(origin=(-85.306480521, -17.600587879, -60.25), x_dir=(1, 0, 0), z_dir=(0, 0, -1))))

    # Horizontal Support: up to this face of the body (flat: up to its plane)
    horizontal_support_end = Plane(part_2.part.faces().sort_by_distance((39.741866718, 104.668935708, 10))[0])
    # Horizontal Support Sketch → Horizontal Support (add, up to the picked face)
    with BuildSketch(Plane(origin=(0, 0, -130.5), x_dir=(-1, 0, 0), z_dir=(0, 0, -1)), mode=Mode.PRIVATE) as horizontal_support_sk1:
        with Locations((-42.21735315, 222.5)):
            Rectangle(HORIZONTAL_SUPPORT_SKETCH_W, HORIZONTAL_SUPPORT_SKETCH_H)
    horizontal_support_tool1 = split(extrude(horizontal_support_sk1.sketch, amount=-HORIZONTAL_SUPPORT_REACH, mode=Mode.PRIVATE), bisect_by=horizontal_support_end, keep=Keep.BOTH, mode=Mode.PRIVATE)
    # Horizontal Support Sketch → Horizontal Support (add, up to the picked face)
    with BuildSketch(Plane(origin=(0, 0, -130.5), x_dir=(-1, 0, 0), z_dir=(0, 0, -1)), mode=Mode.PRIVATE) as horizontal_support_sk2:
        with Locations((-52.21735315, 222.5)):
            Rectangle(HORIZONTAL_SUPPORT_SKETCH_W_2, HORIZONTAL_SUPPORT_SKETCH_H)
    horizontal_support_tool2 = split(extrude(horizontal_support_sk2.sketch, amount=-HORIZONTAL_SUPPORT_REACH, mode=Mode.PRIVATE), bisect_by=horizontal_support_end, keep=Keep.BOTH, mode=Mode.PRIVATE)
    # Horizontal Support Sketch → Horizontal Support (add, up to the picked face)
    with BuildSketch(Plane(origin=(0, 0, -130.5), x_dir=(-1, 0, 0), z_dir=(0, 0, -1)), mode=Mode.PRIVATE) as horizontal_support_sk3:
        with Locations((-52.21735315, 212.5)):
            Rectangle(HORIZONTAL_SUPPORT_SKETCH_W_2, HORIZONTAL_SUPPORT_SKETCH_H_2)
    horizontal_support_tool3 = split(extrude(horizontal_support_sk3.sketch, amount=-HORIZONTAL_SUPPORT_REACH, mode=Mode.PRIVATE), bisect_by=horizontal_support_end, keep=Keep.BOTH, mode=Mode.PRIVATE)
    add(horizontal_support_tool1.solids().sort_by(Axis((42.217353, 222.5, -130.5), (0, 0, 1)))[0])
    add(horizontal_support_tool2.solids().sort_by(Axis((52.217353, 222.5, -130.5), (0, 0, 1)))[0])
    add(horizontal_support_tool3.solids().sort_by(Axis((52.217353, 212.5, -130.5), (0, 0, 1)))[0])

    # Support for bars sketch1 → Support for bars1 (add)
    with BuildSketch(Plane(origin=(0, 225, 0), x_dir=(1, 0, 0), z_dir=(0, 1, 0))):
        with Locations((72.21735315, 60.25)):
            Rectangle(SUPPORT_FOR_BARS_SKETCH1_W, SUPPORT_FOR_BARS_SKETCH1_H)
    extrude(amount=-SUPPORT_FOR_BARS1_DEPTH)

    # Support for bars sketch2 → Support for bars2 (add)
    with BuildSketch(Plane(origin=(0, -10, 0), x_dir=(1, 0, 0), z_dir=(0, 1, 0))):
        Polygon((-39.389302981, 138.902854166), (-86.756360903, 209.48161743), (-103.36312873, 198.336427331), (-55.996070808, 127.757664067), align=None)
    support_for_bars2 = extrude(amount=-SUPPORT_FOR_BARS2_DEPTH)

    # Support for bars3: Support for bars2 across plane
    add(support_for_bars2.mirror(Plane(origin=(-85.306480521, -17.600587879, -60.25), x_dir=(1, 0, 0), z_dir=(0, 0, -1))))


with BuildPart() as body_2_3:
    # Support for bars sketch4 → Support for bars4 (new body)
    with BuildSketch(Plane(origin=(0, 225, 0), x_dir=(1, 0, 0), z_dir=(0, 1, 0))):
        Polygon((34.71735315, 130.5), (-80.722295441, 200.490624609), (-67.510082338, 180.785687221), (34.71735315, 118.805577707), align=None)
    support_for_bars4 = extrude(amount=-SUPPORT_FOR_BARS4_DEPTH)


with BuildPart() as part_3:
    add(part_2.part)

    # Support for bars sketch5: Support for bars4 across plane
    add(support_for_bars4.mirror(Plane(origin=(-85.306480521, -17.600587879, -60.25), x_dir=(1, 0, 0), z_dir=(0, 0, -1))))

    # Array chamfer1
    array_chamfer1_edges = [part_3.edges().sort_by_distance(p)[0] for p in [
        (-163.25, -12.478153268, -165.5),
    ]]
    chamfer(array_chamfer1_edges, length=ARRAY_CHAMFER1_SIZE)

    # Array champer2
    array_champer2_edges = [part_3.edges().sort_by_distance(p)[0] for p in [
        (-163.25, -12.478153268, 45),
    ]]
    chamfer(array_champer2_edges, length=ARRAY_CHAMPER2_SIZE)

    # Front Caster support sketch → Front Caster support (add)
    with BuildSketch(Plane.XZ.offset(15)):
        Polygon((95.25, 5), (175.25, -35), (175.25, -85.5), (95.25, -125.5), (95.25, -105.5), (90.52864045, -105.5), (135.25, -83.139320225), (135.25, -37.360679775), (90.52864045, -15), (95.25, -15), align=None)
    extrude(amount=-FRONT_CASTER_SUPPORT_DEPTH)


solid = Compound([body_2_3.part, part_3.part])
